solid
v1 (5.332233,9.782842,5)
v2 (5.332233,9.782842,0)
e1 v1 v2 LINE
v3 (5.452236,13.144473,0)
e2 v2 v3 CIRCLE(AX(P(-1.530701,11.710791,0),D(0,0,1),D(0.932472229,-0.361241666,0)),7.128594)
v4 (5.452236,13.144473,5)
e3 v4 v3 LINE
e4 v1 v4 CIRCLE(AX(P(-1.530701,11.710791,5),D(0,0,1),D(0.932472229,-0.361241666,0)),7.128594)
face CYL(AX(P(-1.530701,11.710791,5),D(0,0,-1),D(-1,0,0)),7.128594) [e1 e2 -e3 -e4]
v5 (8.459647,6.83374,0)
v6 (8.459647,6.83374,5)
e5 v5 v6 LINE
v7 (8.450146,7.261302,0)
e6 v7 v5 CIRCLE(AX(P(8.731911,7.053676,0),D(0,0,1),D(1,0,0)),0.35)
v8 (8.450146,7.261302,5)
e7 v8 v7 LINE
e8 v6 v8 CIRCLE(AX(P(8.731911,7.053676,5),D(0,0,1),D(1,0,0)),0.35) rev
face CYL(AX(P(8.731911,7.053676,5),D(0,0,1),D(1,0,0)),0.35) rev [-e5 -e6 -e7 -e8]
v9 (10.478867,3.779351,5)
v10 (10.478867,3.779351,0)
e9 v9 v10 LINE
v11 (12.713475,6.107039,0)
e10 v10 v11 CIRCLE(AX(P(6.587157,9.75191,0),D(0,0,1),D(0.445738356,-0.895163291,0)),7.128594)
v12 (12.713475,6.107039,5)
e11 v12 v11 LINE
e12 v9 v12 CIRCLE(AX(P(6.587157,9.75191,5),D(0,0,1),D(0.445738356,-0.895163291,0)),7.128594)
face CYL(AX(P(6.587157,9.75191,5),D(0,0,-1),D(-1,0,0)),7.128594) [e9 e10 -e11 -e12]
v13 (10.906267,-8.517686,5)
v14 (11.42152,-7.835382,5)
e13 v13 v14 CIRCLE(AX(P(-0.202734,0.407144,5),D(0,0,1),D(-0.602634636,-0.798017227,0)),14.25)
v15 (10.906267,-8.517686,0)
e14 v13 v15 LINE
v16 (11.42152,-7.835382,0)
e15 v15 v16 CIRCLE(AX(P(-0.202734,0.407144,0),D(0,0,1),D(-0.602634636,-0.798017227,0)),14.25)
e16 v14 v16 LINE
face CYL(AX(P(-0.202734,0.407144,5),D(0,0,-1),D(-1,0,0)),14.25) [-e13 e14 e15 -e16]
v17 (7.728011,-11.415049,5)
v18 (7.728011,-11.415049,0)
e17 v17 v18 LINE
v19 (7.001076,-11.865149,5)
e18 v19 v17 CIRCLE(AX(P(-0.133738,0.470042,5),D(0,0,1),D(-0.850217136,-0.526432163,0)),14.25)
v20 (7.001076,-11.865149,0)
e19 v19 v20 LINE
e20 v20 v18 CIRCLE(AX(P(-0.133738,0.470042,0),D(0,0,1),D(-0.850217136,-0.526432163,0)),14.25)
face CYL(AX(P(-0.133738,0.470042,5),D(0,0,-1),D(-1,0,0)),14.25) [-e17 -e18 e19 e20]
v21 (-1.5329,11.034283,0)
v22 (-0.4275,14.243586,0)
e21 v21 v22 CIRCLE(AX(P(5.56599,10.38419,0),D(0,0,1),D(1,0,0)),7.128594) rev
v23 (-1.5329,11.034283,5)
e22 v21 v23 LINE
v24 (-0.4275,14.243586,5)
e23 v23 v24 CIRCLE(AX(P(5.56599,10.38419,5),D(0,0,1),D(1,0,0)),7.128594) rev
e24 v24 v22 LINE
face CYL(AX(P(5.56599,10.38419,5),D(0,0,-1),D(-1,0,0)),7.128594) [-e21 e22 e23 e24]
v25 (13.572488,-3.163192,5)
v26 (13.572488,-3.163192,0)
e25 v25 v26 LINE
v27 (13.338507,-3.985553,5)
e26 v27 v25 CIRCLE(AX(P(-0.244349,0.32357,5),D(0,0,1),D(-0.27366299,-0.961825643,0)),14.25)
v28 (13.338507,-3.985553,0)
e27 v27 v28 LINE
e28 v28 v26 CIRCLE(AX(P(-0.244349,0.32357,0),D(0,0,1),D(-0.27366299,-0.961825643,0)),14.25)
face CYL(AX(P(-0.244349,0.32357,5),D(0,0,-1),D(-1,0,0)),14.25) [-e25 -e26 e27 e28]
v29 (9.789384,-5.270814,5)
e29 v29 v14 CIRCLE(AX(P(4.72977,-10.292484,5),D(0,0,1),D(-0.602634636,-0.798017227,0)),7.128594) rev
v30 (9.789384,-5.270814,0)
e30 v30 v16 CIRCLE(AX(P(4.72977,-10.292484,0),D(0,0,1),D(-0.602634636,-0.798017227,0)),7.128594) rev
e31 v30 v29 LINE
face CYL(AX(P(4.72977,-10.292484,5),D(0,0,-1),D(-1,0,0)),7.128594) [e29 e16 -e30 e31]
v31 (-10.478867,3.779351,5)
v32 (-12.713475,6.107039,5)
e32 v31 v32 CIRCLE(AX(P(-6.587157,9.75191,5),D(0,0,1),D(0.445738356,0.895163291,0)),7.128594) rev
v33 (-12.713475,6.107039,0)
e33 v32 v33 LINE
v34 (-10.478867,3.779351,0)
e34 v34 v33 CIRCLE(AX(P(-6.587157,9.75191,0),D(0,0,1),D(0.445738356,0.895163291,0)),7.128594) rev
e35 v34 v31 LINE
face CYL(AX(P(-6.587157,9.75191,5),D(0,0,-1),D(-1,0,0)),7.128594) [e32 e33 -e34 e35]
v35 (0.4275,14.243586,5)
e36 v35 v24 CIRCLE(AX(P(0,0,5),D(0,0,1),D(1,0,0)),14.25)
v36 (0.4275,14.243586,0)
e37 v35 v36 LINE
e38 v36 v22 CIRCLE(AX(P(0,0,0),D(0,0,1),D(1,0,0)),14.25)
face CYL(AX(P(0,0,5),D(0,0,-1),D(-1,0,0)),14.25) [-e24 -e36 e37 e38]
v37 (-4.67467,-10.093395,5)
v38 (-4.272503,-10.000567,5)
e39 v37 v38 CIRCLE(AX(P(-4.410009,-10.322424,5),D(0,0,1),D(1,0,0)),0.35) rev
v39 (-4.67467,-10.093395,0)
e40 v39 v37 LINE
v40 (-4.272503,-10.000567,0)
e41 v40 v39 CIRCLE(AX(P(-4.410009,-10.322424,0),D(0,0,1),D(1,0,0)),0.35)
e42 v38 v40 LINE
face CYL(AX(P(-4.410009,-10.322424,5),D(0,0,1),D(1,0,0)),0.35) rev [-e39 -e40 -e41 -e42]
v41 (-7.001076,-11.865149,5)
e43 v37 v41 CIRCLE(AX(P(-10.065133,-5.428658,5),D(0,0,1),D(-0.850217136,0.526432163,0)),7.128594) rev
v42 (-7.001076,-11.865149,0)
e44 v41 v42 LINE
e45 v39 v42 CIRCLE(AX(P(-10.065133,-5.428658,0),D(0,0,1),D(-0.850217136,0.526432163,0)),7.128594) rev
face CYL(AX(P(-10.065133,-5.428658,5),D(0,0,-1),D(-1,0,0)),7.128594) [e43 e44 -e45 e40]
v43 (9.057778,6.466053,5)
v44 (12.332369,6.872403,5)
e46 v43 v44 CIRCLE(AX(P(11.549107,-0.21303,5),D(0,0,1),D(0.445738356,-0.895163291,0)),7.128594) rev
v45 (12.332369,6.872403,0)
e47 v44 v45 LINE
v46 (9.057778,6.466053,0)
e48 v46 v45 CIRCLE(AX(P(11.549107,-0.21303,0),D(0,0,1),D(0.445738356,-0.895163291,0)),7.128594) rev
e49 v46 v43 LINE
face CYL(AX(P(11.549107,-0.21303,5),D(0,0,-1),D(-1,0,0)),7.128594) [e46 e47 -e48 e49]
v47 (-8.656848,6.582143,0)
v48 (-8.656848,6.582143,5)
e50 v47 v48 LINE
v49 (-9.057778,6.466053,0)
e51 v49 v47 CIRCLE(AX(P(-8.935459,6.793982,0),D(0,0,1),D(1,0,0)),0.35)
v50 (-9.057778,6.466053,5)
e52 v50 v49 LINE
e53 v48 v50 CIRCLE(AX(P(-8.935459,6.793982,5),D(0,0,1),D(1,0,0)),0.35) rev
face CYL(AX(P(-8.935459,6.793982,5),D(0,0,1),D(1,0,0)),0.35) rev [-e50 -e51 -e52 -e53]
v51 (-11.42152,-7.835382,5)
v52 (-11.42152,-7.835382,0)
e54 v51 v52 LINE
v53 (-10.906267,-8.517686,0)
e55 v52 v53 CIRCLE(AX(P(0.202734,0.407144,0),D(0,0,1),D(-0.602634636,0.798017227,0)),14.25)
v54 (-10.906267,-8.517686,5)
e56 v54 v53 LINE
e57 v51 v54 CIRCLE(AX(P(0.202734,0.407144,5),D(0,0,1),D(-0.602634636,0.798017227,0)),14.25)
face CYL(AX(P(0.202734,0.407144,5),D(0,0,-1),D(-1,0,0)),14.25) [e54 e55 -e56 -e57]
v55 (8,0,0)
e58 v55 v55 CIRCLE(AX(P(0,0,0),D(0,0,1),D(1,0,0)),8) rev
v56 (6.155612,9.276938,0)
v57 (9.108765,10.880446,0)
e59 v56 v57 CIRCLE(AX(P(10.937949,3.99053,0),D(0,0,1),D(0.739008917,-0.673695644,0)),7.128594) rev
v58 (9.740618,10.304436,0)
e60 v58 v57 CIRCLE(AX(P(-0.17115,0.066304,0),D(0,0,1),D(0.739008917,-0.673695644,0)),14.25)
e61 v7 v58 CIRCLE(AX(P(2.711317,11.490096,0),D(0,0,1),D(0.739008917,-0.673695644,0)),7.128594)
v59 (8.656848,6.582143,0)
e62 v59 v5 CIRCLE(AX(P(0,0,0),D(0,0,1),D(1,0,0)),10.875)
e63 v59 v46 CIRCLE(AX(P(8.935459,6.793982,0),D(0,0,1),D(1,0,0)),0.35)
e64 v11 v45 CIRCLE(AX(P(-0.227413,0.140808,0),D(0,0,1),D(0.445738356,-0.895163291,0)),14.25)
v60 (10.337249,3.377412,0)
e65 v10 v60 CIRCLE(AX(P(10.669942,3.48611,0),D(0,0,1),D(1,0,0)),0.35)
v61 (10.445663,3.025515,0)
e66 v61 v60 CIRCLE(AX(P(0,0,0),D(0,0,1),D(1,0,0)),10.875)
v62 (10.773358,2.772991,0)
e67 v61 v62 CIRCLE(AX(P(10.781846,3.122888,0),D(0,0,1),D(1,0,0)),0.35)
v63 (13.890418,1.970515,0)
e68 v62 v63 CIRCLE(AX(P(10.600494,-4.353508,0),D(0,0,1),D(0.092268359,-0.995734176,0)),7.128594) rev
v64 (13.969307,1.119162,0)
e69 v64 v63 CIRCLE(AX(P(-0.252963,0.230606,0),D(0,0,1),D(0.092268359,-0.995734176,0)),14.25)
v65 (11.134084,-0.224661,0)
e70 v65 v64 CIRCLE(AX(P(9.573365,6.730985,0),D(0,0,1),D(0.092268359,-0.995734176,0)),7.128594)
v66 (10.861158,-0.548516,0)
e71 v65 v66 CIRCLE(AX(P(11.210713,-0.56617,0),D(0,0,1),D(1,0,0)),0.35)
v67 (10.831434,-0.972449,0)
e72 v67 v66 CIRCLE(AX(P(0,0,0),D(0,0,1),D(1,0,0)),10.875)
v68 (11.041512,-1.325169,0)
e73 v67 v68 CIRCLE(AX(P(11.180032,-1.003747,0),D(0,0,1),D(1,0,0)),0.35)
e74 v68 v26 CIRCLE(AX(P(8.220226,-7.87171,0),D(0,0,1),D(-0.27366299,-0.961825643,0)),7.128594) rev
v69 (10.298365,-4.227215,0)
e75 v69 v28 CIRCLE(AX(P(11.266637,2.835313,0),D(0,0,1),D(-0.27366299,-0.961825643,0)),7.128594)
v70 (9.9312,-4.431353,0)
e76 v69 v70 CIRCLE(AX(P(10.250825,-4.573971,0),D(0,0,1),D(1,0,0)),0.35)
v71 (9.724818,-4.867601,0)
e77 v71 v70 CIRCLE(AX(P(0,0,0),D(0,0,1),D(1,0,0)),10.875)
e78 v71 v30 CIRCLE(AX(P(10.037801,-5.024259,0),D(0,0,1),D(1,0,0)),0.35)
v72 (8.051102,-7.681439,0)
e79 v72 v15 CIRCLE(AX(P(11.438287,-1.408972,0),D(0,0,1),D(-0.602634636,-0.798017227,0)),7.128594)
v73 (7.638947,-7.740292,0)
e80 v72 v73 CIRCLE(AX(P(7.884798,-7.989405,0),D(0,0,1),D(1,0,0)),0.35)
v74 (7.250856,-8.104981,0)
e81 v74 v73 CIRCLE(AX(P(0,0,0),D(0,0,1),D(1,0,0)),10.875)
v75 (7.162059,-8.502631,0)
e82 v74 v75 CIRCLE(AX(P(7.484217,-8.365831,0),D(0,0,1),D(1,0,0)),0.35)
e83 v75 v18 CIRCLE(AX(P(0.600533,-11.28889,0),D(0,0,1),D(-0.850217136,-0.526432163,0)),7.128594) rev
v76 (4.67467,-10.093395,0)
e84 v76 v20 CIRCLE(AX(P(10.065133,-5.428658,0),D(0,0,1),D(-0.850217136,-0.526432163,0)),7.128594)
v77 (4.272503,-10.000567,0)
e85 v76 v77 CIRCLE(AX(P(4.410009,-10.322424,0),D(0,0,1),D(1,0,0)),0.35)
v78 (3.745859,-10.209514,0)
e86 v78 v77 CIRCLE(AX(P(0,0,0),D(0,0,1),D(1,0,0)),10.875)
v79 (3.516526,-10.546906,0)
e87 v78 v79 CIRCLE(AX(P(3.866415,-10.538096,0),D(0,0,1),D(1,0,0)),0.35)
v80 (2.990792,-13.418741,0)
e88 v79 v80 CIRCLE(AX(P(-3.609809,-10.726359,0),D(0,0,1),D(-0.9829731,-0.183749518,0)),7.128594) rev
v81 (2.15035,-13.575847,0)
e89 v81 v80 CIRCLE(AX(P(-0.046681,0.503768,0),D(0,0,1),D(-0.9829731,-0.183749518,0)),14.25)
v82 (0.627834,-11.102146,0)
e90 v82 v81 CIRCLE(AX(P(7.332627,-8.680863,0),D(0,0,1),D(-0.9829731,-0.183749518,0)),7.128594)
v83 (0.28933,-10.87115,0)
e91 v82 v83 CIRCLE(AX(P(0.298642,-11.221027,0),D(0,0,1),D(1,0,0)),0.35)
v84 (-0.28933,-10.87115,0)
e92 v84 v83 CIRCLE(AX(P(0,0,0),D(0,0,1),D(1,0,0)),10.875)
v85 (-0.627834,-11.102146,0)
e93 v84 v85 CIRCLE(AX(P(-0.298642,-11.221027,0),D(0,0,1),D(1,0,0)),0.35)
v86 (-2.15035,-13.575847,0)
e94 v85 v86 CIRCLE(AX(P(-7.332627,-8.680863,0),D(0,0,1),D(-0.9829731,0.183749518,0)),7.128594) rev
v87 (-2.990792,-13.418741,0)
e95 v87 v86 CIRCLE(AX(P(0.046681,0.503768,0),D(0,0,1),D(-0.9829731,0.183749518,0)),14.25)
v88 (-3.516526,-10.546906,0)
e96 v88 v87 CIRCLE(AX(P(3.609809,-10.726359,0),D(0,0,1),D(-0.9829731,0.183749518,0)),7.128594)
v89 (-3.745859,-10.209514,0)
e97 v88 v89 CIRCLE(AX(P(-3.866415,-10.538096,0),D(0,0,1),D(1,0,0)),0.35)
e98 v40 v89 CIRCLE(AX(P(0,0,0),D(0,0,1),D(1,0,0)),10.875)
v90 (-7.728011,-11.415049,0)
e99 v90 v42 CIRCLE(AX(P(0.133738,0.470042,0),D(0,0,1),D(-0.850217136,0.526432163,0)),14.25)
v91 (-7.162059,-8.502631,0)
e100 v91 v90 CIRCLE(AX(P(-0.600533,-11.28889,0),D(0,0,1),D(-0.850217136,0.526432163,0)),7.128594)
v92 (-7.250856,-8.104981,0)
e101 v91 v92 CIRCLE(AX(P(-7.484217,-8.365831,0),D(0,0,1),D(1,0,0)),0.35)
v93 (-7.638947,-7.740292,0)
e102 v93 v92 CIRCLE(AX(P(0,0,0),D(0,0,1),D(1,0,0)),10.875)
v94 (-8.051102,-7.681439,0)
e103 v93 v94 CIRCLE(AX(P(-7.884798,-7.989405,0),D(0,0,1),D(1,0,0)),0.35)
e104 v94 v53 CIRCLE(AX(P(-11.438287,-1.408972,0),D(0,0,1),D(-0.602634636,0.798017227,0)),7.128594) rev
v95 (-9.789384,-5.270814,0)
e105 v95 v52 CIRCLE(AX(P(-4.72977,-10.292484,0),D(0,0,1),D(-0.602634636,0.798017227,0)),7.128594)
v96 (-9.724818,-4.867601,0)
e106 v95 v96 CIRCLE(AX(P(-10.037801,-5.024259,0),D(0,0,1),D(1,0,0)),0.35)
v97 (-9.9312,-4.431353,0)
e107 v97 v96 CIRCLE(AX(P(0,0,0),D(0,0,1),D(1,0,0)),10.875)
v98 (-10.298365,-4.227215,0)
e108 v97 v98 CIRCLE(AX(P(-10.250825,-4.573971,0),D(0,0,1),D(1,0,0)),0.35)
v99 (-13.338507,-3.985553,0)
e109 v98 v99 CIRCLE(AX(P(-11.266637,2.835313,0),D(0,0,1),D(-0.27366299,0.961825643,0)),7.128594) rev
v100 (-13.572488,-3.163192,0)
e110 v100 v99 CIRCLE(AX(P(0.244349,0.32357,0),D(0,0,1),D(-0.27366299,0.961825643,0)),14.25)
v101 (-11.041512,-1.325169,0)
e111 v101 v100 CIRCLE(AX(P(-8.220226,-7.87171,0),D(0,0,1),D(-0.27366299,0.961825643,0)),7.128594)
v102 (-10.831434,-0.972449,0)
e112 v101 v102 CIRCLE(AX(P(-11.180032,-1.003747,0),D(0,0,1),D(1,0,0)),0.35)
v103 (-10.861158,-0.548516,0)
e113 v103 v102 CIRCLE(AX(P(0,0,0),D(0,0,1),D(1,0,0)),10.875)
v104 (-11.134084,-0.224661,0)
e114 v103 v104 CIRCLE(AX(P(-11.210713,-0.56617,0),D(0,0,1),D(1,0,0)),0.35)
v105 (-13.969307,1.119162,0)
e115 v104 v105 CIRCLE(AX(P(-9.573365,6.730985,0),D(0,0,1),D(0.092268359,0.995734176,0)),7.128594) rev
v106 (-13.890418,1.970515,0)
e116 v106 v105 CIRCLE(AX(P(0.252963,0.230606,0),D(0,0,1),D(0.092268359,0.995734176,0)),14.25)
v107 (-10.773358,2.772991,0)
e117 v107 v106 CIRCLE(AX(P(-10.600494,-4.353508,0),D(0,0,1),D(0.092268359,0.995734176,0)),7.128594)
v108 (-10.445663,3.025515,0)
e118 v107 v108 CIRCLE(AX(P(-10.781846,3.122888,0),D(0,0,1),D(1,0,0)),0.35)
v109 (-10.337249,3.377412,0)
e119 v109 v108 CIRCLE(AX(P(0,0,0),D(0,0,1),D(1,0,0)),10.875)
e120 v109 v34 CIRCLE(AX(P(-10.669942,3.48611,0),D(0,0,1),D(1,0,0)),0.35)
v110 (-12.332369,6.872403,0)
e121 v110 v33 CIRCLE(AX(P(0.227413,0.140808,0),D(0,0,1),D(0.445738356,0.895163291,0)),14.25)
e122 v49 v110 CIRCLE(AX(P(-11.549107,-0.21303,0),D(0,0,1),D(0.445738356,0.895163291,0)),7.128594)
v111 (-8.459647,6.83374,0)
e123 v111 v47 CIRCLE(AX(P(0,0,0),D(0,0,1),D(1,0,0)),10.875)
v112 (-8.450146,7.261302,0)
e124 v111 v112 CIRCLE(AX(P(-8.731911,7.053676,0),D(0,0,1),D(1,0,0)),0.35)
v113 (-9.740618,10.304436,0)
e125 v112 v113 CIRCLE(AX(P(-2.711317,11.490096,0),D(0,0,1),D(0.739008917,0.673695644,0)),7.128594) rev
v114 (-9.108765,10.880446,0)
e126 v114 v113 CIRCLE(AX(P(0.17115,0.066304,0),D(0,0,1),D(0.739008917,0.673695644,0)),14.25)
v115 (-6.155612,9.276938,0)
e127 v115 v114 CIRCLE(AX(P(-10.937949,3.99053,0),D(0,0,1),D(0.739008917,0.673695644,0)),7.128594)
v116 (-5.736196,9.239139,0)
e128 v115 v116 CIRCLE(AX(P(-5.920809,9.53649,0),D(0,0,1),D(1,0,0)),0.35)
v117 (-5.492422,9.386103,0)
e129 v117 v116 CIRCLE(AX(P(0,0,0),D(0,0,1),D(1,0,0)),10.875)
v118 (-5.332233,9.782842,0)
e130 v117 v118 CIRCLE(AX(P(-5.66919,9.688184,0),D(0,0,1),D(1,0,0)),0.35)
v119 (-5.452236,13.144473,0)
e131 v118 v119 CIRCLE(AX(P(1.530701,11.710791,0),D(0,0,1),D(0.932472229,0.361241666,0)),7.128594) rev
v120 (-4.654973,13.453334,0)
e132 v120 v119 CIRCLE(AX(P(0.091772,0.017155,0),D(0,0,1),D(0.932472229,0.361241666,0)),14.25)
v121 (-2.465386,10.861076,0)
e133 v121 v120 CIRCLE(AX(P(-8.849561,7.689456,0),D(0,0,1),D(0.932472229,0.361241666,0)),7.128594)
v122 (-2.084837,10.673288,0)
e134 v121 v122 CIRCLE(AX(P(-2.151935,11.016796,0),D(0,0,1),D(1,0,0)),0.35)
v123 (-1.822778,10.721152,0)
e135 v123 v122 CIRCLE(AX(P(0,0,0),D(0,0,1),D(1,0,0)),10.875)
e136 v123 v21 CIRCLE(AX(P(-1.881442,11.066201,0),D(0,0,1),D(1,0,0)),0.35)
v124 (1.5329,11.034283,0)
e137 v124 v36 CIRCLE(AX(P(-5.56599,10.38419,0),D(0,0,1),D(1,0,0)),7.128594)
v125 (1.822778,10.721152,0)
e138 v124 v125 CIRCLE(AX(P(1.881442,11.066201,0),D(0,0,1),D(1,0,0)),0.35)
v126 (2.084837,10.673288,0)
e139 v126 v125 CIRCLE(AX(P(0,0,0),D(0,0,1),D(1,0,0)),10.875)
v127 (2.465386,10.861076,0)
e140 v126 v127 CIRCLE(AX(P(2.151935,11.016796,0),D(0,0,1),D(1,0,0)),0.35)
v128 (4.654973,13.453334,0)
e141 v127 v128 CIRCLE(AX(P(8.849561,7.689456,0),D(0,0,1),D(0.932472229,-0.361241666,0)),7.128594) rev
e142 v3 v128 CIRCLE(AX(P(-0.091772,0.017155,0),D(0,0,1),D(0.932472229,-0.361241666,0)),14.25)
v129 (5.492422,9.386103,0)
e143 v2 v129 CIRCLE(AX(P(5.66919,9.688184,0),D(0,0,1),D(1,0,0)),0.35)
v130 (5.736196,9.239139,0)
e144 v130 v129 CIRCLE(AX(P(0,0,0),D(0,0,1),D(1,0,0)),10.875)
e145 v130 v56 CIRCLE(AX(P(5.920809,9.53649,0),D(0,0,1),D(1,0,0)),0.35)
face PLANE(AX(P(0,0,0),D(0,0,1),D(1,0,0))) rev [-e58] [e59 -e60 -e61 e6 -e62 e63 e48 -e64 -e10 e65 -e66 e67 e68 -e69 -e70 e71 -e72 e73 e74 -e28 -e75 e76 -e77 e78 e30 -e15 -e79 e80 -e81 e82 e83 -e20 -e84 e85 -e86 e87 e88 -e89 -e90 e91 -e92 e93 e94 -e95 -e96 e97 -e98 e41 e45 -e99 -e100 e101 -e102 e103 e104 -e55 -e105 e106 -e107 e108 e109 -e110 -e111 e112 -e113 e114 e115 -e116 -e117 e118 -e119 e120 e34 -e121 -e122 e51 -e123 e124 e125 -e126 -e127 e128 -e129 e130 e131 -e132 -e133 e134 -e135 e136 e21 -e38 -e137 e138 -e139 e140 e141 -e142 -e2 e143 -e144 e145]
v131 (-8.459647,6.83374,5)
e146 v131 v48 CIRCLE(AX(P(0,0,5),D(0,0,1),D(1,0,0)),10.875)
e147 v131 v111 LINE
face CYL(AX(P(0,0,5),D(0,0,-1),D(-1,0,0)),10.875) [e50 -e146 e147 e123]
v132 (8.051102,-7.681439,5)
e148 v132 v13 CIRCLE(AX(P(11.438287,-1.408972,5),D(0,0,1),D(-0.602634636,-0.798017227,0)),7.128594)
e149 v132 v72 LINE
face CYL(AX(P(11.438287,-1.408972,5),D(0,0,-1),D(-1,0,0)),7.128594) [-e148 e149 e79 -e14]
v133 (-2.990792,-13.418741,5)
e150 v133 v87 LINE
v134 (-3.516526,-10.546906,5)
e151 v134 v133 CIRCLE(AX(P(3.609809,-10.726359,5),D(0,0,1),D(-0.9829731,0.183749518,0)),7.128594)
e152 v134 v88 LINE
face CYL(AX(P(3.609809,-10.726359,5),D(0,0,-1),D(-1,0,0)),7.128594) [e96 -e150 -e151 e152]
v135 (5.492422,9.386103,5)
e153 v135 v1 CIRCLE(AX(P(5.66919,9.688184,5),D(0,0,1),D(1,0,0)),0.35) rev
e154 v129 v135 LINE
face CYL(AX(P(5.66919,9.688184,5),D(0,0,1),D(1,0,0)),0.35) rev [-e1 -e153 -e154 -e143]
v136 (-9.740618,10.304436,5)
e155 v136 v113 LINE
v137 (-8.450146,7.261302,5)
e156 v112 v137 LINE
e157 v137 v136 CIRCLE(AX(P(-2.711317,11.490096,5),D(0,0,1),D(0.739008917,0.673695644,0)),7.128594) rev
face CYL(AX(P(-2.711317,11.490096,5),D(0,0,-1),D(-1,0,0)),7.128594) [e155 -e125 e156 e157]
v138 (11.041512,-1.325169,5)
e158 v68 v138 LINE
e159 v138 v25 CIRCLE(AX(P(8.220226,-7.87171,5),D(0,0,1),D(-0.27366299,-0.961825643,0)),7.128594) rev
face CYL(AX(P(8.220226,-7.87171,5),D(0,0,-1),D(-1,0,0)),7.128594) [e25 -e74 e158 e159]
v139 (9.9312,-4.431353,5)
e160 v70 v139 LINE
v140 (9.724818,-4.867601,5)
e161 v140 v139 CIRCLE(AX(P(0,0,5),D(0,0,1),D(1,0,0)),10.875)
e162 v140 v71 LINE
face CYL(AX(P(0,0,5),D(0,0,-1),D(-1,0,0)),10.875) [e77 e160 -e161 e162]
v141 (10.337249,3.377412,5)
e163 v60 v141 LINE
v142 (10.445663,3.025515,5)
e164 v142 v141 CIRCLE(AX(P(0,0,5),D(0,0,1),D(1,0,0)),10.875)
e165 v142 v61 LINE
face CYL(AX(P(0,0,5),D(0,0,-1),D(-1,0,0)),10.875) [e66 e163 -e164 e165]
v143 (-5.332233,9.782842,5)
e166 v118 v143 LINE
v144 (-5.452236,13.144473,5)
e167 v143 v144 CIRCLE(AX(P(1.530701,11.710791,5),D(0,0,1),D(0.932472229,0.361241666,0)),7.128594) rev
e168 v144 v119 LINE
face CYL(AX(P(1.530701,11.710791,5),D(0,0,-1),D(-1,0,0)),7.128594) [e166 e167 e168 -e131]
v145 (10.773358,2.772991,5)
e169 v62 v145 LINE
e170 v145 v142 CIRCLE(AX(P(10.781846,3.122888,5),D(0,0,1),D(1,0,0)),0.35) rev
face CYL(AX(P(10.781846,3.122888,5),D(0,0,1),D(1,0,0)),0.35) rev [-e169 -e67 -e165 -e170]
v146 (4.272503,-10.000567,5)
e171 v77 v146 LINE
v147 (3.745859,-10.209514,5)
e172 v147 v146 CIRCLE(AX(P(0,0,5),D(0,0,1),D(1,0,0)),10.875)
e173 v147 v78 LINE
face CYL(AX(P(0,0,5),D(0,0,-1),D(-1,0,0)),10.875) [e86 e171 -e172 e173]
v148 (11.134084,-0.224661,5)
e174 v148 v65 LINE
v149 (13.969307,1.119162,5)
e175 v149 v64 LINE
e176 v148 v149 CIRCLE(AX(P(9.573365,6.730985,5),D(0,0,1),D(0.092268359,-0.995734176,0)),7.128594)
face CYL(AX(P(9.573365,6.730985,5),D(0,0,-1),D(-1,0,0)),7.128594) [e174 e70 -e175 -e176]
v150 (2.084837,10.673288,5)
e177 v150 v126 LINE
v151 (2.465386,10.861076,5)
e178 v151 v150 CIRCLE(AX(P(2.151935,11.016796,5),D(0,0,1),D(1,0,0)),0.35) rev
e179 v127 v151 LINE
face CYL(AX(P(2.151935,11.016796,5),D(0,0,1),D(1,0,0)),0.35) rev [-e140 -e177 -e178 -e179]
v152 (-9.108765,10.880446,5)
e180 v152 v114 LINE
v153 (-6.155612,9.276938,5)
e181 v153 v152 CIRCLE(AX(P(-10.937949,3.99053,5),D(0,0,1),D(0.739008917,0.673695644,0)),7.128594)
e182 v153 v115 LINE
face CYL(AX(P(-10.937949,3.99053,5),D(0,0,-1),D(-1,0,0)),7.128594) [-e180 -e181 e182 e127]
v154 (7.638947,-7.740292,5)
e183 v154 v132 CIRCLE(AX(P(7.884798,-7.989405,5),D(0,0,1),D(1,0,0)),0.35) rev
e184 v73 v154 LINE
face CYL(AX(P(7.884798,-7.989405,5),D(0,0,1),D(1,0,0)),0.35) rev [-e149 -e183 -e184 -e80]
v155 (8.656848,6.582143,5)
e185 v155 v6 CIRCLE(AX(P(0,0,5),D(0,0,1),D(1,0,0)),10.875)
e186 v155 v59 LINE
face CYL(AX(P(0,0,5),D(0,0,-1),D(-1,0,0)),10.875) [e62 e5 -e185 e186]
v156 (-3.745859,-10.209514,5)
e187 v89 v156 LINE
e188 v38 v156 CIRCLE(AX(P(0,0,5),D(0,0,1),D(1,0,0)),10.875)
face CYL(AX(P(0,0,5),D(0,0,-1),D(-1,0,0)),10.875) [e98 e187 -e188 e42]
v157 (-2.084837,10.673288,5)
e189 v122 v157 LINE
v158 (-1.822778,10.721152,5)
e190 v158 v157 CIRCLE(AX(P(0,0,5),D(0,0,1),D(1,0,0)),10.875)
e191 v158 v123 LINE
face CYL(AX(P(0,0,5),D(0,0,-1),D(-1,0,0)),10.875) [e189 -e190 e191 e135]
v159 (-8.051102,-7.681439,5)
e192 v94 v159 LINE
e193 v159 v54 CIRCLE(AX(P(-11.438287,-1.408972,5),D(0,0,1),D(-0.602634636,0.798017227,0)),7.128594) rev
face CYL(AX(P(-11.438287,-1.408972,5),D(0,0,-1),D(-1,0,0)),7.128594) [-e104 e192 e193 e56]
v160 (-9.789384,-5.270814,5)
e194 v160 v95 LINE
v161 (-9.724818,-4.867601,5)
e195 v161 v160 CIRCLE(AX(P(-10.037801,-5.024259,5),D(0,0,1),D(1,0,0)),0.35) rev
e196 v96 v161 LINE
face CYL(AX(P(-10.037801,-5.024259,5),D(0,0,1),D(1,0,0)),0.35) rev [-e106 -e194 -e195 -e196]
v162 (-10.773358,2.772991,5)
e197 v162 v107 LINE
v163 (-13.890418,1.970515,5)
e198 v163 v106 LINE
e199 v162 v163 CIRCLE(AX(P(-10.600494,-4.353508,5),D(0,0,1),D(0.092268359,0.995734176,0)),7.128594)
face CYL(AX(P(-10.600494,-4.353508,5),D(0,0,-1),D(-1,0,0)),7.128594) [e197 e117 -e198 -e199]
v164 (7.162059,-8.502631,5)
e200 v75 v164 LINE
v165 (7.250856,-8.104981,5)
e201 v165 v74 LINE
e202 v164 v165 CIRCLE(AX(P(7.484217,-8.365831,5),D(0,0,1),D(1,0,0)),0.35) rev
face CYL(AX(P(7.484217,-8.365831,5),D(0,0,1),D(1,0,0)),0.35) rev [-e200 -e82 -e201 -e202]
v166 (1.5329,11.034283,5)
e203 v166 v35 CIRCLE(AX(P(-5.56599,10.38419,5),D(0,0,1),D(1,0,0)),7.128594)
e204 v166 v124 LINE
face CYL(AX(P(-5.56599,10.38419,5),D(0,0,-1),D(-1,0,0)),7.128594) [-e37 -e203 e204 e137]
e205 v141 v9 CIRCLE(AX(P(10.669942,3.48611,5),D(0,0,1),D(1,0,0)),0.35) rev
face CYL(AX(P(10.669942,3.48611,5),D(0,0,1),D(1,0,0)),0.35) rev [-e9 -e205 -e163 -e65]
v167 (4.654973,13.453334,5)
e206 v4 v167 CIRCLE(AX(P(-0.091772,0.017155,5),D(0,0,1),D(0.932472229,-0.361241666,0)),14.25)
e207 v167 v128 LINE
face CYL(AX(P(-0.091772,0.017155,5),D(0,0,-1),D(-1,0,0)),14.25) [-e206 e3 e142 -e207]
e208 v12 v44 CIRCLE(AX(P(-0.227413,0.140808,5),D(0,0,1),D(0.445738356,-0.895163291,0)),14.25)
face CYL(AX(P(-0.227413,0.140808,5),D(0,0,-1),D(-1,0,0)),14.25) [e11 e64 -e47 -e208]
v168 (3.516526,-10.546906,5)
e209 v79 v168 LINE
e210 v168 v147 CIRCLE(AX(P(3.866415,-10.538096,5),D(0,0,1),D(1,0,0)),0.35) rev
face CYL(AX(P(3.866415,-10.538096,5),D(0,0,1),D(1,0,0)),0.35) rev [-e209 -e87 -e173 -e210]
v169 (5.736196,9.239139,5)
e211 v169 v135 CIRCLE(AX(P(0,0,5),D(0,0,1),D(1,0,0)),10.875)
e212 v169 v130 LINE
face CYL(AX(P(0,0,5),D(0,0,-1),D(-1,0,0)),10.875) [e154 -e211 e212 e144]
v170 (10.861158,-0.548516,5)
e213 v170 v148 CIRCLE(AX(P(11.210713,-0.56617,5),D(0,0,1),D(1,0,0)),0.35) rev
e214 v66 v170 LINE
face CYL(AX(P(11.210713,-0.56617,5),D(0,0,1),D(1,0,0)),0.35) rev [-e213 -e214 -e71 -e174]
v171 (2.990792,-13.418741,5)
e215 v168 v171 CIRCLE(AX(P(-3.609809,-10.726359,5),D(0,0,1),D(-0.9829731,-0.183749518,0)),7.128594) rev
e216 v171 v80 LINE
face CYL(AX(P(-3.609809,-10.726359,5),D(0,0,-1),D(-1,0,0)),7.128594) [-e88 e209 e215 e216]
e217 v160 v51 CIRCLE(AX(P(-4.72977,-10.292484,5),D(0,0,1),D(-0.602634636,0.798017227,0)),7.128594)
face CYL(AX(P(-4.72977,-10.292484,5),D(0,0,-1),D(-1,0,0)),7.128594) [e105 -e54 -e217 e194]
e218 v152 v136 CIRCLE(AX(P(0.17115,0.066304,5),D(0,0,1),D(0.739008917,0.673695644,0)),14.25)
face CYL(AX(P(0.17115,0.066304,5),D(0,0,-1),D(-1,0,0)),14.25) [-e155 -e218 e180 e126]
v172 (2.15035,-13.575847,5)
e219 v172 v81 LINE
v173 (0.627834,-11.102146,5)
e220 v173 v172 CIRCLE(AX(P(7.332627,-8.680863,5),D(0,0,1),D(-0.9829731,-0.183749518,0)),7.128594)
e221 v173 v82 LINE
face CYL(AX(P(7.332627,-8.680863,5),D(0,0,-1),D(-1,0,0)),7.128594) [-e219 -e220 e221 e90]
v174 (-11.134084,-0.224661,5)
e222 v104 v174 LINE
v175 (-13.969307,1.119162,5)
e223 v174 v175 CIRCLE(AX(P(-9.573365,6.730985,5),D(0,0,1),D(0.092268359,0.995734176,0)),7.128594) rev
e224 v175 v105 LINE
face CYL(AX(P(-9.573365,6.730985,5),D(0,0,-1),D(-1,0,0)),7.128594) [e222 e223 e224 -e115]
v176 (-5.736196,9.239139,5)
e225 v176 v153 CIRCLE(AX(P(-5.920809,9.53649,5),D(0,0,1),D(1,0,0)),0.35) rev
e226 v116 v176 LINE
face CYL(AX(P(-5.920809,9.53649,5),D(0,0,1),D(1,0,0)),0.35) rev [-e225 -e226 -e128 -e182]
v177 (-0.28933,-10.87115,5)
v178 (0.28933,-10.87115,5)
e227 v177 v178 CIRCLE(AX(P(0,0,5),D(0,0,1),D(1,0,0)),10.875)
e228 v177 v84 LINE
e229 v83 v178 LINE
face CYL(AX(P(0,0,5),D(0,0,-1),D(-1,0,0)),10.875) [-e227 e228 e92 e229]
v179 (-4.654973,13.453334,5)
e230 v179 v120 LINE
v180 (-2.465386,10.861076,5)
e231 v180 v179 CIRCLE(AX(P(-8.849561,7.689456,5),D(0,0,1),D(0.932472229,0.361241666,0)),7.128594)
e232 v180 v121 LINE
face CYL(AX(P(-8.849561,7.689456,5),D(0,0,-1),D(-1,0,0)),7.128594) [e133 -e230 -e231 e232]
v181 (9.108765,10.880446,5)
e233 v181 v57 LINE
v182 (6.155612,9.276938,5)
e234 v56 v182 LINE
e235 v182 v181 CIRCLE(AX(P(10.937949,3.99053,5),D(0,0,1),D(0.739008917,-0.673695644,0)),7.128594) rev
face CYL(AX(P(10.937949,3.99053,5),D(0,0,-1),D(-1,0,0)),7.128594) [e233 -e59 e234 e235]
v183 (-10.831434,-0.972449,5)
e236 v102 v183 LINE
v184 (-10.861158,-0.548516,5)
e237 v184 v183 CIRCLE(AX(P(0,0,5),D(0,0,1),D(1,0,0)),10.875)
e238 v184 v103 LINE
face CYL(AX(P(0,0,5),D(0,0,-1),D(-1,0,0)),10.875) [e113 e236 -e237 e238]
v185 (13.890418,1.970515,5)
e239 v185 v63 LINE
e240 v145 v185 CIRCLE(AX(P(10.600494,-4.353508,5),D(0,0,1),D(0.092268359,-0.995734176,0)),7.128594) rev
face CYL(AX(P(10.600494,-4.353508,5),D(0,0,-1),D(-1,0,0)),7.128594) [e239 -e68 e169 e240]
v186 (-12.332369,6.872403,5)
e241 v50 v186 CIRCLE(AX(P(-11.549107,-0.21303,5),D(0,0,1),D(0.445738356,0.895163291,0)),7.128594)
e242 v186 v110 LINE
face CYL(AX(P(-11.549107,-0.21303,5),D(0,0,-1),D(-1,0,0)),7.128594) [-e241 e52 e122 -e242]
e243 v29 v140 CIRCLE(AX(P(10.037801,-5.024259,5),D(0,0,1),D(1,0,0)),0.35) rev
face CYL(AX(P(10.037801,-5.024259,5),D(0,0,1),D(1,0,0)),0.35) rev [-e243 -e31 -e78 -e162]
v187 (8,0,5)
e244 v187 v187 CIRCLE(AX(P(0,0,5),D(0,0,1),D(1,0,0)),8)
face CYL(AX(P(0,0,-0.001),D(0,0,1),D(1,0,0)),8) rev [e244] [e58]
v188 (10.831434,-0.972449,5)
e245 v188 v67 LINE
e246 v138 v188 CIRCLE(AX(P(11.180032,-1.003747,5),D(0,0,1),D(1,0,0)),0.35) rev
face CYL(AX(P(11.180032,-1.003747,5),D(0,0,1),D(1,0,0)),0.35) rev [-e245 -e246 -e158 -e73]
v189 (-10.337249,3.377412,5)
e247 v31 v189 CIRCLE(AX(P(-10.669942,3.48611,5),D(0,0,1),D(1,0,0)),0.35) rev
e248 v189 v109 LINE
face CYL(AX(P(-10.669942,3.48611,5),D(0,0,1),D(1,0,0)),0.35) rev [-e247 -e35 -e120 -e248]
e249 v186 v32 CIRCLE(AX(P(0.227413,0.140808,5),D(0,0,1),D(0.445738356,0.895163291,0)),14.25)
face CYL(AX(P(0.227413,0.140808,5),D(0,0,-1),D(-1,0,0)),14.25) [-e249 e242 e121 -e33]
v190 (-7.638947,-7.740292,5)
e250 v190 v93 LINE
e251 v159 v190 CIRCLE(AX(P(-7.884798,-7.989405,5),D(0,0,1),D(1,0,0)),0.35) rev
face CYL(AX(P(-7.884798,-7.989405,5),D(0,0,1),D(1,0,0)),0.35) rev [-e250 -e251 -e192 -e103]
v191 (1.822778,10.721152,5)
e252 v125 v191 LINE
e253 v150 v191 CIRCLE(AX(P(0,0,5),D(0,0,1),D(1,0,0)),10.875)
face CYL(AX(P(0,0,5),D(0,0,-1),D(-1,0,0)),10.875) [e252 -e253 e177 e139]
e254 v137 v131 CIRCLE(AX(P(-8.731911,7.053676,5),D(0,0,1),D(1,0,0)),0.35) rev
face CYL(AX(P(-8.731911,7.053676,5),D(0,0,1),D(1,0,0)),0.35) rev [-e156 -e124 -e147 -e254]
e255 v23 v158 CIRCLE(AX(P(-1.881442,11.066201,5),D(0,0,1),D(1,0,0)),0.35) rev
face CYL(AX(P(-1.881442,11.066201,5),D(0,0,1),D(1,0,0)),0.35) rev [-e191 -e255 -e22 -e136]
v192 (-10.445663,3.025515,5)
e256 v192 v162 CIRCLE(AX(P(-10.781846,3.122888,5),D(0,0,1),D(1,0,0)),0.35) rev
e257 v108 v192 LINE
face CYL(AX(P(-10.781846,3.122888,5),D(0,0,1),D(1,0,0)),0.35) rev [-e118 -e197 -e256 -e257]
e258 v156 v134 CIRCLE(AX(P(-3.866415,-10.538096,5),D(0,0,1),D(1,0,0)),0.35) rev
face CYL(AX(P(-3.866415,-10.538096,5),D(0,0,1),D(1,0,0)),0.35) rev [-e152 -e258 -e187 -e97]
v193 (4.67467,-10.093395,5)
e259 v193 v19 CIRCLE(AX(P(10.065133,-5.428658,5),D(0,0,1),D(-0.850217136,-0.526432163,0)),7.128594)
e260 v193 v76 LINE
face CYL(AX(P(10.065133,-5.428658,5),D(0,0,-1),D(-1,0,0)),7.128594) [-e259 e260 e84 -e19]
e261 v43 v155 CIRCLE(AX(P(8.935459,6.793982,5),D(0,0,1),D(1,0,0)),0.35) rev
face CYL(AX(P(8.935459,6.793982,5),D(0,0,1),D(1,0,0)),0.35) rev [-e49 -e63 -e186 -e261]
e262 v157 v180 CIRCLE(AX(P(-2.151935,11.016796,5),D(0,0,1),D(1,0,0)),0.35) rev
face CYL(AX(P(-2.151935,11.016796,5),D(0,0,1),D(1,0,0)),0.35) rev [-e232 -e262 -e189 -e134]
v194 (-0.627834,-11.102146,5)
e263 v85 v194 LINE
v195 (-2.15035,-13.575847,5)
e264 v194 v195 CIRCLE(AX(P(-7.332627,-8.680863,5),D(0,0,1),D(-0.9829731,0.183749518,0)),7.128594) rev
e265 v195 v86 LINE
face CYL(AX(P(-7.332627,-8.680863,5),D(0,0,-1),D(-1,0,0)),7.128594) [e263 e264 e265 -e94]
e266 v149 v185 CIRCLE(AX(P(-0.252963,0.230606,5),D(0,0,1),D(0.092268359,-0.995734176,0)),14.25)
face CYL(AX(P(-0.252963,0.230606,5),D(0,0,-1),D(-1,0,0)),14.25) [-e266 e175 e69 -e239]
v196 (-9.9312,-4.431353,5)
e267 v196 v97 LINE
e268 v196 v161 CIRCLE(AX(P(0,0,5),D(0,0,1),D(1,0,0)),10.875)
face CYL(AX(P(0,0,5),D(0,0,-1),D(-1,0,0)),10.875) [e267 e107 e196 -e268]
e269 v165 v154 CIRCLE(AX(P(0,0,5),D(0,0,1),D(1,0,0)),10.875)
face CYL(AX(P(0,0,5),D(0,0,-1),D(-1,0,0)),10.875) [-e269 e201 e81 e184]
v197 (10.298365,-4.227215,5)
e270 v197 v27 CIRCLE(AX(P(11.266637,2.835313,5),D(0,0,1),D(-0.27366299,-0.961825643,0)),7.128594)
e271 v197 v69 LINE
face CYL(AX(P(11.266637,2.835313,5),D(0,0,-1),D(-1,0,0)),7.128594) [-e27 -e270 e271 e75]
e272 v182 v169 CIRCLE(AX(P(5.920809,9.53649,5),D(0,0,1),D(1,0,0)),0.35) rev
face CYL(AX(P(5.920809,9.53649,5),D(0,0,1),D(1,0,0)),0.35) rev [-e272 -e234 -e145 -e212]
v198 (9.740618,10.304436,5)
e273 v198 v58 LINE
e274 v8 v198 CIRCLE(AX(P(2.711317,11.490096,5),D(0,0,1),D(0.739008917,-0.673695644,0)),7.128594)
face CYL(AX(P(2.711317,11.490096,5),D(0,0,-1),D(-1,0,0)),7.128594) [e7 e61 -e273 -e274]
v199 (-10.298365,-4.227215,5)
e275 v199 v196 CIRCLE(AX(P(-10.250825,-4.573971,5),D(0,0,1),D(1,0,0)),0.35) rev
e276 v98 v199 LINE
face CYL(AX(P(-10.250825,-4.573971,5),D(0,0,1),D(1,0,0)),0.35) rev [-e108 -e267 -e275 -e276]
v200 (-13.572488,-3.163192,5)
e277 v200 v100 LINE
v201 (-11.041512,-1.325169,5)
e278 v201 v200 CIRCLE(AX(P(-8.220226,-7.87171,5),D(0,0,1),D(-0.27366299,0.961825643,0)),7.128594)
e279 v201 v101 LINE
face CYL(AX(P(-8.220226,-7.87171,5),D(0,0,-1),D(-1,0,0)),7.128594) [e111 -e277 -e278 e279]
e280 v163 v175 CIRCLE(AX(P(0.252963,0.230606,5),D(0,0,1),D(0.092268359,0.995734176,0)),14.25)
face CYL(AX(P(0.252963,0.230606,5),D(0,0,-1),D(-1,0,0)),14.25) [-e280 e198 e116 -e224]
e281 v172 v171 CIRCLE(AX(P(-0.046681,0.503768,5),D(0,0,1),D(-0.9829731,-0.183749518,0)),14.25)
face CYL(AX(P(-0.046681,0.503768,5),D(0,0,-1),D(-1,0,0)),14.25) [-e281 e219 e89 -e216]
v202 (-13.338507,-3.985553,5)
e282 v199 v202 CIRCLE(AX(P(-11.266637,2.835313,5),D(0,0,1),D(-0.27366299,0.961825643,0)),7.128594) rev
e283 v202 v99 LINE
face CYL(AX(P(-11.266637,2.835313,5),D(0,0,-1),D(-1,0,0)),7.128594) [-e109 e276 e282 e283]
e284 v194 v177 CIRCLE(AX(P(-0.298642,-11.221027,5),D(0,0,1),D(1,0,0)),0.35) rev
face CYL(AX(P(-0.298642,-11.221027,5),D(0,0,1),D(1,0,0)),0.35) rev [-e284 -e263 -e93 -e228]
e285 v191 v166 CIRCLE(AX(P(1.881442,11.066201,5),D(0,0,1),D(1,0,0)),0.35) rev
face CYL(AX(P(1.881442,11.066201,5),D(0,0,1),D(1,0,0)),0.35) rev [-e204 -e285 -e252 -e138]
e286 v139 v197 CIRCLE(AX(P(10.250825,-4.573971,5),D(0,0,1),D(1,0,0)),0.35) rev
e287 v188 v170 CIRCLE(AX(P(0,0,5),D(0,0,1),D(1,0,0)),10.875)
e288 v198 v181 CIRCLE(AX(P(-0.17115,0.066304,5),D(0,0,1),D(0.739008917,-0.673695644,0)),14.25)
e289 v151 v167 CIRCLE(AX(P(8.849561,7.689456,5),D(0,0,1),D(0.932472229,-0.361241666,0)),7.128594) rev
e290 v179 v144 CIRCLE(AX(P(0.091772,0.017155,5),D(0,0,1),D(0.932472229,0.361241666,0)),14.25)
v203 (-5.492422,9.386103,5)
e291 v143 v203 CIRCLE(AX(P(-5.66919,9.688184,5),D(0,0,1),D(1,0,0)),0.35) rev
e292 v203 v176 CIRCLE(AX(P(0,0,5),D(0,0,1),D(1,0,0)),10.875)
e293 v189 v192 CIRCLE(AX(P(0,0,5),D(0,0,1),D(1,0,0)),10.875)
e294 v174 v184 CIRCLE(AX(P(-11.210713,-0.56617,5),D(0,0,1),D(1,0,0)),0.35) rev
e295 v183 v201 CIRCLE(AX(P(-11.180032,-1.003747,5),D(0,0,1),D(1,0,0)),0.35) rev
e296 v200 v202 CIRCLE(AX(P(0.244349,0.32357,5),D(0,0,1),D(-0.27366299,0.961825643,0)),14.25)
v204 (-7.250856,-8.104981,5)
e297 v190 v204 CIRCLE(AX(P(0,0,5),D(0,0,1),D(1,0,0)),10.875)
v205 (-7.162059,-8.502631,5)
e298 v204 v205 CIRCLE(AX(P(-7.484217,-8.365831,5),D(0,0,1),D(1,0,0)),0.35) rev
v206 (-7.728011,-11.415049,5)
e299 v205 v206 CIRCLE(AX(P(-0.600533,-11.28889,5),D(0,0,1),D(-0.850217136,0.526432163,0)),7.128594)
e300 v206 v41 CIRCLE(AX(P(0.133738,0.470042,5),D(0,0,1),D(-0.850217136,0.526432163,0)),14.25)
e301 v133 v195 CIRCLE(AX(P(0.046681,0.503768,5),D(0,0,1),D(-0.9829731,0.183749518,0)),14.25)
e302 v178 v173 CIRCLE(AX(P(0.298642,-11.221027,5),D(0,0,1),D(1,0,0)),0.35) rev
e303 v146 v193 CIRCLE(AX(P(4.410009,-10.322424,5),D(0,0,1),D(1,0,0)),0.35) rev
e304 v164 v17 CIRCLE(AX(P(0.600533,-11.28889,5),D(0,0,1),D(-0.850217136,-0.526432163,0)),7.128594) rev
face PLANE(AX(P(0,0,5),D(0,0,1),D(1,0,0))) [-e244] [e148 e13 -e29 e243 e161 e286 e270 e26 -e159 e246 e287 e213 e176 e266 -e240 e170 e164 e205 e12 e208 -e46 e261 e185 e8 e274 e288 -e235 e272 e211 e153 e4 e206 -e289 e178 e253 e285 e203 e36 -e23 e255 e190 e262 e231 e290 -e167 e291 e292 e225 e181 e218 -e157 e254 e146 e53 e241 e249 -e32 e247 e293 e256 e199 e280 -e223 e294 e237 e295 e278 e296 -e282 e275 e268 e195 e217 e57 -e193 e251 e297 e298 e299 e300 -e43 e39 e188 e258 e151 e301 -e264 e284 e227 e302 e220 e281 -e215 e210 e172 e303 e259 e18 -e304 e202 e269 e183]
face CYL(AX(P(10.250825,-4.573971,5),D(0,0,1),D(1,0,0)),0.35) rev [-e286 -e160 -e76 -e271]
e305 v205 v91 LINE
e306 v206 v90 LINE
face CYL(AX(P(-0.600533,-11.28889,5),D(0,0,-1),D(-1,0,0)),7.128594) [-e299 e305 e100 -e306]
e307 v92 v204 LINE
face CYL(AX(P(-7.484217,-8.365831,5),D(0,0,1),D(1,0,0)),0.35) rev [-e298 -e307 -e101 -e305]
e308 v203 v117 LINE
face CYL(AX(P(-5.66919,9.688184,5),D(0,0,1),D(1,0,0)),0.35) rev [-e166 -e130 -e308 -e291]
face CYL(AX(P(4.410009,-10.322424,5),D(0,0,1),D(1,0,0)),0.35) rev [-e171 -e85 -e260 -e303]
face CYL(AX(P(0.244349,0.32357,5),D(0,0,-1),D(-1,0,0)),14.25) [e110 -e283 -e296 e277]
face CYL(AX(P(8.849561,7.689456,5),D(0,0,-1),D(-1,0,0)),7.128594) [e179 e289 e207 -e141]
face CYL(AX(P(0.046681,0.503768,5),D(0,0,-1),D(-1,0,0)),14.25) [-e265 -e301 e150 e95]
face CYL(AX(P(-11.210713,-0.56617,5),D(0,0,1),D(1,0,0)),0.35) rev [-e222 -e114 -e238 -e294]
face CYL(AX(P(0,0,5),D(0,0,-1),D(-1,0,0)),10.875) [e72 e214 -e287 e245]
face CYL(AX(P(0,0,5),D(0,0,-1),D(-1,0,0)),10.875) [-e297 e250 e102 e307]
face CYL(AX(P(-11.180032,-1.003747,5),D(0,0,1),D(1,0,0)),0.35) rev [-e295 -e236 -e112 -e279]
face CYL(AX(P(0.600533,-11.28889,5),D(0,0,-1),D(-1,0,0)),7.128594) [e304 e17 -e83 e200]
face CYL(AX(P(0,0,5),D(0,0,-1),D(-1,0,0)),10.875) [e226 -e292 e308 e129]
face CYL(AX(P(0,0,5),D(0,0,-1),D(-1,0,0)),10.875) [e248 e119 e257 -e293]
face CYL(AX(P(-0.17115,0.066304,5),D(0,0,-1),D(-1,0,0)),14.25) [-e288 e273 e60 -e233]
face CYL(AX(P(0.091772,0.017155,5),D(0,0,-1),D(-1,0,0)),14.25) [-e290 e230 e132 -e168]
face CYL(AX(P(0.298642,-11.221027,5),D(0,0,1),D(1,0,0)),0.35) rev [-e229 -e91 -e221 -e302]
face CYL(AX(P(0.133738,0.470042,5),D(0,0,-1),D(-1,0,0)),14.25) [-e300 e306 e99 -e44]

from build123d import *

# Parameters (mm, degrees)
SKETCH_1_R               = 10.875
EXTRUDE_1_DEPTH          = 5
EXTRUDE_2_DEPTH          = 5
FILLET_1_R               = 0.35
PATTERN_CIRCULAR_1_DEPTH = 5
CUT_EXTRUDE_1_REACH      = 22.572
SKETCH_2_R               = 8


# Read off the part's stored shape, not the designer's step: 원형 패턴1
with BuildPart() as part:
    # 스케치1 → 보스-돌출1 (new body)
    with BuildSketch(Plane.XY):
        Circle(SKETCH_1_R)
    extrude(amount=EXTRUDE_1_DEPTH)

    # 스케치1<3> → 보스-돌출2 (add)
    with BuildSketch(Plane.XY):
        with BuildLine():
            ThreePointArc((1.5525, 10.763613183), (1.216970842, 12.576974386), (0.4275, 14.243586057))
            ThreePointArc((0.4275, 14.243586057), (0, 14.25), (-0.4275, 14.243586057))
            ThreePointArc((-0.4275, 14.243586057), (-1.216970842, 12.576974386), (-1.5525, 10.763613183))
            ThreePointArc((-1.5525, 10.763613183), (0, 10.875), (1.5525, 10.763613183))
        make_face()
    extrude(amount=EXTRUDE_2_DEPTH)

    # 필렛1
    fillet_1_edges = [part.edges().sort_by_distance(p)[0] for p in [
        (-1.5525, 10.763613183, 2.5),
        (1.5525, 10.763613183, 2.5),
    ]]
    fillet(fillet_1_edges, radius=FILLET_1_R)

    # 원형 패턴1 outline → 원형 패턴1 (add)
    with BuildSketch(Plane.XY):
        with BuildLine():
            ThreePointArc((2.084837088, 10.673288121), (3.842906104, 10.173381821), (5.492422476, 9.386102511))
            ThreePointArc((5.492422476, 9.386102511), (5.344646109, 9.557145045), (5.332233471, 9.782842475))
            ThreePointArc((5.332233471, 9.782842475), (5.593355494, 11.4564781), (5.452236305, 13.144472855))
            ThreePointArc((5.452236305, 13.144472855), (5.055921411, 13.304884491), (4.654972549, 13.453334479))
            ThreePointArc((4.654972549, 13.453334479), (3.403689946, 12.289385973), (2.465385752, 10.861075951))
            ThreePointArc((2.465385752, 10.861075951), (2.306817266, 10.702930709), (2.084837088, 10.673288121))
        make_face()
        with BuildLine():
            ThreePointArc((5.736195698, 9.2391387), (7.199095251, 8.150990895), (8.459646862, 6.833739823))
            ThreePointArc((8.459646862, 6.833739823), (8.381997736, 7.045900933), (8.450146114, 7.261301773))
            ThreePointArc((8.450146114, 7.261301773), (9.274201483, 8.707038787), (9.740617886, 10.304436202))
            ThreePointArc((9.740617886, 10.304436202), (9.42901262, 10.597181051), (9.108765262, 10.880445977))
            ThreePointArc((9.108765262, 10.880445977), (7.536352291, 10.255192371), (6.155612256, 9.27693802))
            ThreePointArc((6.155612256, 9.27693802), (5.952224819, 9.187903085), (5.736195698, 9.2391387))
        make_face()
        with BuildLine():
            ThreePointArc((8.656847778, 6.582143386), (9.631277253, 5.050160738), (10.337248772, 3.377412148))
            ThreePointArc((10.337248772, 3.377412148), (10.339832595, 3.602419922), (10.478866532, 3.779351375))
            ThreePointArc((10.478866532, 3.779351375), (11.729603042, 4.815098477), (12.713475046, 6.107038785))
            ThreePointArc((12.713475046, 6.107038785), (12.528663426, 6.492580033), (12.332368752, 6.872403399))
            ThreePointArc((12.332368752, 6.872403399), (10.671238348, 6.86130469), (9.057778331, 6.466052652))
            ThreePointArc((9.057778331, 6.466052652), (8.838113972, 6.457792134), (8.656847778, 6.582143386))
        make_face()
        with BuildLine():
            ThreePointArc((10.44566348, 3.025514743), (10.802249116, 1.255802147), (10.861158072, -0.548516485))
            ThreePointArc((10.861158072, -0.548516485), (10.943077602, -0.34062274), (11.134084318, -0.224661311))
            ThreePointArc((11.134084318, -0.224661311), (12.626546762, 0.289328326), (13.969306954, 1.119162384))
            ThreePointArc((13.969306954, 1.119162384), (13.936248813, 1.545430549), (13.890417506, 1.970515105))
            ThreePointArc((13.890417506, 1.970515105), (12.377771936, 2.549980076), (10.773358461, 2.772990553))
            ThreePointArc((10.773358461, 2.772990553), (10.568207288, 2.845653785), (10.44566348, 3.025514743))
        make_face()
        with BuildLine():
            ThreePointArc((10.831434222, -0.972449329), (10.524388312, -2.739137757), (9.931200049, -4.431353133))
            ThreePointArc((9.931200049, -4.431353133), (10.080749628, -4.26807205), (10.298365111, -4.227215102))
            ThreePointArc((10.298365111, -4.227215102), (11.831510548, -4.270865326), (13.338506551, -3.985552654))
            ThreePointArc((13.338506551, -3.985552654), (13.461666574, -3.57612745), (13.572488407, -3.163191729))
            ThreePointArc((13.572488407, -3.163191729), (12.409057254, -2.103647039), (11.041512467, -1.325168872))
            ThreePointArc((11.041512467, -1.325168872), (10.879326869, -1.182845296), (10.831434222, -0.972449329))
        make_face()
        with BuildLine():
            ThreePointArc((9.724818044, -4.867600951), (8.799895988, -6.389636578), (7.638946645, -7.74029193))
            ThreePointArc((7.638946645, -7.74029193), (7.835322049, -7.642919348), (8.051101932, -7.68143897))
            ThreePointArc((8.051101932, -7.68143897), (9.434573038, -8.250170344), (10.906266927, -8.517686277))
            ThreePointArc((10.906266927, -8.517686277), (11.169011671, -8.180399177), (11.421519541, -7.835381548))
            ThreePointArc((11.421519541, -7.835381548), (10.743744256, -6.465085659), (9.78938361, -5.27081353))
            ThreePointArc((9.78938361, -5.27081353), (9.692203368, -5.079599132), (9.724818044, -4.867600951))
        make_face()
        with BuildLine():
            ThreePointArc((7.250855805, -8.104980882), (5.839114845, -9.174440736), (4.272503154, -10.000567074))
            ThreePointArc((4.272503154, -10.000567074), (4.488726043, -9.981391229), (4.674670149, -10.09339498))
            ThreePointArc((4.674670149, -10.09339498), (5.746046713, -11.099844355), (7.00107552, -11.865148727))
            ThreePointArc((7.00107552, -11.865148727), (7.367919852, -11.645552222), (7.728011172, -11.415049228))
            ThreePointArc((7.728011172, -11.415049228), (7.598229184, -9.929070664), (7.162058655, -8.502630716))
            ThreePointArc((7.162058655, -8.502630716), (7.142629708, -8.289552802), (7.250855805, -8.104980882))
        make_face()
        with BuildLine():
            ThreePointArc((3.745858716, -10.209513577), (2.04453627, -10.681081239), (0.289330355, -10.871150489))
            ThreePointArc((0.289330355, -10.871150489), (0.495925275, -10.93192564), (0.627834307, -11.102146342))
            ThreePointArc((0.627834307, -11.102146342), (1.261761796, -12.417365945), (2.150350071, -13.57584665))
            ThreePointArc((2.150350071, -13.57584665), (2.57174963, -13.503598465), (2.990792071, -13.418740812))
            ThreePointArc((2.990792071, -13.418740812), (3.40225572, -12.010026536), (3.516526006, -10.546906395))
            ThreePointArc((3.516526006, -10.546906395), (3.576953157, -10.341342504), (3.745858716, -10.209513577))
        make_face()
        with BuildLine():
            ThreePointArc((-0.289330355, -10.871150489), (-2.04453627, -10.681081239), (-3.745858716, -10.209513577))
            ThreePointArc((-3.745858716, -10.209513577), (-3.576953157, -10.341342504), (-3.516526006, -10.546906395))
            ThreePointArc((-3.516526006, -10.546906395), (-3.40225572, -12.010026536), (-2.990792071, -13.418740812))
            ThreePointArc((-2.990792071, -13.418740812), (-2.57174963, -13.503598465), (-2.150350071, -13.57584665))
            ThreePointArc((-2.150350071, -13.57584665), (-1.261761796, -12.417365945), (-0.627834307, -11.102146342))
            ThreePointArc((-0.627834307, -11.102146342), (-0.495925275, -10.93192564), (-0.289330355, -10.871150489))
        make_face()
        with BuildLine():
            ThreePointArc((-4.272503154, -10.000567074), (-5.839114845, -9.174440736), (-7.250855805, -8.104980882))
            ThreePointArc((-7.250855805, -8.104980882), (-7.142629708, -8.289552802), (-7.162058655, -8.502630716))
            ThreePointArc((-7.162058655, -8.502630716), (-7.598229184, -9.929070664), (-7.728011172, -11.415049228))
            ThreePointArc((-7.728011172, -11.415049228), (-7.367919852, -11.645552222), (-7.00107552, -11.865148727))
            ThreePointArc((-7.00107552, -11.865148727), (-5.746046713, -11.099844355), (-4.674670149, -10.09339498))
            ThreePointArc((-4.674670149, -10.09339498), (-4.488726043, -9.981391229), (-4.272503154, -10.000567074))
        make_face()
        with BuildLine():
            ThreePointArc((-7.638946645, -7.74029193), (-8.799895988, -6.389636578), (-9.724818044, -4.867600951))
            ThreePointArc((-9.724818044, -4.867600951), (-9.692203368, -5.079599132), (-9.78938361, -5.27081353))
            ThreePointArc((-9.78938361, -5.27081353), (-10.743744256, -6.465085659), (-11.421519541, -7.835381548))
            ThreePointArc((-11.421519541, -7.835381548), (-11.169011671, -8.180399177), (-10.906266927, -8.517686277))
            ThreePointArc((-10.906266927, -8.517686277), (-9.434573038, -8.250170344), (-8.051101932, -7.68143897))
            ThreePointArc((-8.051101932, -7.68143897), (-7.835322049, -7.642919348), (-7.638946645, -7.74029193))
        make_face()
        with BuildLine():
            ThreePointArc((-9.931200049, -4.431353133), (-10.524388312, -2.739137757), (-10.831434222, -0.972449329))
            ThreePointArc((-10.831434222, -0.972449329), (-10.879326869, -1.182845296), (-11.041512467, -1.325168872))
            ThreePointArc((-11.041512467, -1.325168872), (-12.409057254, -2.103647039), (-13.572488407, -3.163191729))
            ThreePointArc((-13.572488407, -3.163191729), (-13.461666574, -3.57612745), (-13.338506551, -3.985552654))
            ThreePointArc((-13.338506551, -3.985552654), (-11.831510548, -4.270865326), (-10.298365111, -4.227215102))
            ThreePointArc((-10.298365111, -4.227215102), (-10.080749628, -4.26807205), (-9.931200049, -4.431353133))
        make_face()
        with BuildLine():
            ThreePointArc((-10.861158072, -0.548516485), (-10.802249116, 1.255802147), (-10.44566348, 3.025514743))
            ThreePointArc((-10.44566348, 3.025514743), (-10.568207288, 2.845653785), (-10.773358461, 2.772990553))
            ThreePointArc((-10.773358461, 2.772990553), (-12.377771936, 2.549980076), (-13.890417506, 1.970515105))
            ThreePointArc((-13.890417506, 1.970515105), (-13.936248813, 1.545430549), (-13.969306954, 1.119162384))
            ThreePointArc((-13.969306954, 1.119162384), (-12.626546762, 0.289328326), (-11.134084318, -0.224661311))
            ThreePointArc((-11.134084318, -0.224661311), (-10.943077602, -0.34062274), (-10.861158072, -0.548516485))
        make_face()
        with BuildLine():
            ThreePointArc((-10.337248772, 3.377412148), (-9.631277253, 5.050160738), (-8.656847778, 6.582143386))
            ThreePointArc((-8.656847778, 6.582143386), (-8.838113972, 6.457792134), (-9.057778331, 6.466052652))
            ThreePointArc((-9.057778331, 6.466052652), (-10.671238348, 6.86130469), (-12.332368752, 6.872403399))
            ThreePointArc((-12.332368752, 6.872403399), (-12.528663426, 6.492580033), (-12.713475046, 6.107038785))
            ThreePointArc((-12.713475046, 6.107038785), (-11.729603042, 4.815098477), (-10.478866532, 3.779351375))
            ThreePointArc((-10.478866532, 3.779351375), (-10.339832595, 3.602419922), (-10.337248772, 3.377412148))
        make_face()
        with BuildLine():
            ThreePointArc((-8.459646862, 6.833739823), (-7.199095251, 8.150990895), (-5.736195698, 9.2391387))
            ThreePointArc((-5.736195698, 9.2391387), (-5.952224819, 9.187903085), (-6.155612256, 9.27693802))
            ThreePointArc((-6.155612256, 9.27693802), (-7.536352291, 10.255192371), (-9.108765262, 10.880445977))
            ThreePointArc((-9.108765262, 10.880445977), (-9.42901262, 10.597181051), (-9.740617886, 10.304436202))
            ThreePointArc((-9.740617886, 10.304436202), (-9.274201483, 8.707038787), (-8.450146114, 7.261301773))
            ThreePointArc((-8.450146114, 7.261301773), (-8.381997736, 7.045900933), (-8.459646862, 6.833739823))
        make_face()
        with BuildLine():
            ThreePointArc((-2.465385752, 10.861075951), (-3.403689946, 12.289385973), (-4.654972549, 13.453334479))
            ThreePointArc((-4.654972549, 13.453334479), (-5.055921411, 13.304884491), (-5.452236305, 13.144472855))
            ThreePointArc((-5.452236305, 13.144472855), (-5.593355494, 11.4564781), (-5.332233471, 9.782842475))
            ThreePointArc((-5.332233471, 9.782842475), (-5.344646109, 9.557145045), (-5.492422476, 9.386102511))
            ThreePointArc((-5.492422476, 9.386102511), (-3.842906104, 10.173381821), (-2.084837088, 10.673288121))
            ThreePointArc((-2.084837088, 10.673288121), (-2.306817266, 10.702930709), (-2.465385752, 10.861075951))
        make_face()
    extrude(amount=PATTERN_CIRCULAR_1_DEPTH)

    # 스케치2 → 컷-돌출1 (cut, up to next)
    with BuildSketch(Plane.XY.offset(5), mode=Mode.PRIVATE) as cut_extrude_1_sk1:
        Circle(SKETCH_2_R)
    cut_extrude_1_tool1 = extrude(cut_extrude_1_sk1.sketch, amount=-CUT_EXTRUDE_1_REACH, mode=Mode.PRIVATE) & part.part
    add(cut_extrude_1_tool1.solids().sort_by_distance((0, 0, 5))[0], mode=Mode.SUBTRACT)


solid = part.part
